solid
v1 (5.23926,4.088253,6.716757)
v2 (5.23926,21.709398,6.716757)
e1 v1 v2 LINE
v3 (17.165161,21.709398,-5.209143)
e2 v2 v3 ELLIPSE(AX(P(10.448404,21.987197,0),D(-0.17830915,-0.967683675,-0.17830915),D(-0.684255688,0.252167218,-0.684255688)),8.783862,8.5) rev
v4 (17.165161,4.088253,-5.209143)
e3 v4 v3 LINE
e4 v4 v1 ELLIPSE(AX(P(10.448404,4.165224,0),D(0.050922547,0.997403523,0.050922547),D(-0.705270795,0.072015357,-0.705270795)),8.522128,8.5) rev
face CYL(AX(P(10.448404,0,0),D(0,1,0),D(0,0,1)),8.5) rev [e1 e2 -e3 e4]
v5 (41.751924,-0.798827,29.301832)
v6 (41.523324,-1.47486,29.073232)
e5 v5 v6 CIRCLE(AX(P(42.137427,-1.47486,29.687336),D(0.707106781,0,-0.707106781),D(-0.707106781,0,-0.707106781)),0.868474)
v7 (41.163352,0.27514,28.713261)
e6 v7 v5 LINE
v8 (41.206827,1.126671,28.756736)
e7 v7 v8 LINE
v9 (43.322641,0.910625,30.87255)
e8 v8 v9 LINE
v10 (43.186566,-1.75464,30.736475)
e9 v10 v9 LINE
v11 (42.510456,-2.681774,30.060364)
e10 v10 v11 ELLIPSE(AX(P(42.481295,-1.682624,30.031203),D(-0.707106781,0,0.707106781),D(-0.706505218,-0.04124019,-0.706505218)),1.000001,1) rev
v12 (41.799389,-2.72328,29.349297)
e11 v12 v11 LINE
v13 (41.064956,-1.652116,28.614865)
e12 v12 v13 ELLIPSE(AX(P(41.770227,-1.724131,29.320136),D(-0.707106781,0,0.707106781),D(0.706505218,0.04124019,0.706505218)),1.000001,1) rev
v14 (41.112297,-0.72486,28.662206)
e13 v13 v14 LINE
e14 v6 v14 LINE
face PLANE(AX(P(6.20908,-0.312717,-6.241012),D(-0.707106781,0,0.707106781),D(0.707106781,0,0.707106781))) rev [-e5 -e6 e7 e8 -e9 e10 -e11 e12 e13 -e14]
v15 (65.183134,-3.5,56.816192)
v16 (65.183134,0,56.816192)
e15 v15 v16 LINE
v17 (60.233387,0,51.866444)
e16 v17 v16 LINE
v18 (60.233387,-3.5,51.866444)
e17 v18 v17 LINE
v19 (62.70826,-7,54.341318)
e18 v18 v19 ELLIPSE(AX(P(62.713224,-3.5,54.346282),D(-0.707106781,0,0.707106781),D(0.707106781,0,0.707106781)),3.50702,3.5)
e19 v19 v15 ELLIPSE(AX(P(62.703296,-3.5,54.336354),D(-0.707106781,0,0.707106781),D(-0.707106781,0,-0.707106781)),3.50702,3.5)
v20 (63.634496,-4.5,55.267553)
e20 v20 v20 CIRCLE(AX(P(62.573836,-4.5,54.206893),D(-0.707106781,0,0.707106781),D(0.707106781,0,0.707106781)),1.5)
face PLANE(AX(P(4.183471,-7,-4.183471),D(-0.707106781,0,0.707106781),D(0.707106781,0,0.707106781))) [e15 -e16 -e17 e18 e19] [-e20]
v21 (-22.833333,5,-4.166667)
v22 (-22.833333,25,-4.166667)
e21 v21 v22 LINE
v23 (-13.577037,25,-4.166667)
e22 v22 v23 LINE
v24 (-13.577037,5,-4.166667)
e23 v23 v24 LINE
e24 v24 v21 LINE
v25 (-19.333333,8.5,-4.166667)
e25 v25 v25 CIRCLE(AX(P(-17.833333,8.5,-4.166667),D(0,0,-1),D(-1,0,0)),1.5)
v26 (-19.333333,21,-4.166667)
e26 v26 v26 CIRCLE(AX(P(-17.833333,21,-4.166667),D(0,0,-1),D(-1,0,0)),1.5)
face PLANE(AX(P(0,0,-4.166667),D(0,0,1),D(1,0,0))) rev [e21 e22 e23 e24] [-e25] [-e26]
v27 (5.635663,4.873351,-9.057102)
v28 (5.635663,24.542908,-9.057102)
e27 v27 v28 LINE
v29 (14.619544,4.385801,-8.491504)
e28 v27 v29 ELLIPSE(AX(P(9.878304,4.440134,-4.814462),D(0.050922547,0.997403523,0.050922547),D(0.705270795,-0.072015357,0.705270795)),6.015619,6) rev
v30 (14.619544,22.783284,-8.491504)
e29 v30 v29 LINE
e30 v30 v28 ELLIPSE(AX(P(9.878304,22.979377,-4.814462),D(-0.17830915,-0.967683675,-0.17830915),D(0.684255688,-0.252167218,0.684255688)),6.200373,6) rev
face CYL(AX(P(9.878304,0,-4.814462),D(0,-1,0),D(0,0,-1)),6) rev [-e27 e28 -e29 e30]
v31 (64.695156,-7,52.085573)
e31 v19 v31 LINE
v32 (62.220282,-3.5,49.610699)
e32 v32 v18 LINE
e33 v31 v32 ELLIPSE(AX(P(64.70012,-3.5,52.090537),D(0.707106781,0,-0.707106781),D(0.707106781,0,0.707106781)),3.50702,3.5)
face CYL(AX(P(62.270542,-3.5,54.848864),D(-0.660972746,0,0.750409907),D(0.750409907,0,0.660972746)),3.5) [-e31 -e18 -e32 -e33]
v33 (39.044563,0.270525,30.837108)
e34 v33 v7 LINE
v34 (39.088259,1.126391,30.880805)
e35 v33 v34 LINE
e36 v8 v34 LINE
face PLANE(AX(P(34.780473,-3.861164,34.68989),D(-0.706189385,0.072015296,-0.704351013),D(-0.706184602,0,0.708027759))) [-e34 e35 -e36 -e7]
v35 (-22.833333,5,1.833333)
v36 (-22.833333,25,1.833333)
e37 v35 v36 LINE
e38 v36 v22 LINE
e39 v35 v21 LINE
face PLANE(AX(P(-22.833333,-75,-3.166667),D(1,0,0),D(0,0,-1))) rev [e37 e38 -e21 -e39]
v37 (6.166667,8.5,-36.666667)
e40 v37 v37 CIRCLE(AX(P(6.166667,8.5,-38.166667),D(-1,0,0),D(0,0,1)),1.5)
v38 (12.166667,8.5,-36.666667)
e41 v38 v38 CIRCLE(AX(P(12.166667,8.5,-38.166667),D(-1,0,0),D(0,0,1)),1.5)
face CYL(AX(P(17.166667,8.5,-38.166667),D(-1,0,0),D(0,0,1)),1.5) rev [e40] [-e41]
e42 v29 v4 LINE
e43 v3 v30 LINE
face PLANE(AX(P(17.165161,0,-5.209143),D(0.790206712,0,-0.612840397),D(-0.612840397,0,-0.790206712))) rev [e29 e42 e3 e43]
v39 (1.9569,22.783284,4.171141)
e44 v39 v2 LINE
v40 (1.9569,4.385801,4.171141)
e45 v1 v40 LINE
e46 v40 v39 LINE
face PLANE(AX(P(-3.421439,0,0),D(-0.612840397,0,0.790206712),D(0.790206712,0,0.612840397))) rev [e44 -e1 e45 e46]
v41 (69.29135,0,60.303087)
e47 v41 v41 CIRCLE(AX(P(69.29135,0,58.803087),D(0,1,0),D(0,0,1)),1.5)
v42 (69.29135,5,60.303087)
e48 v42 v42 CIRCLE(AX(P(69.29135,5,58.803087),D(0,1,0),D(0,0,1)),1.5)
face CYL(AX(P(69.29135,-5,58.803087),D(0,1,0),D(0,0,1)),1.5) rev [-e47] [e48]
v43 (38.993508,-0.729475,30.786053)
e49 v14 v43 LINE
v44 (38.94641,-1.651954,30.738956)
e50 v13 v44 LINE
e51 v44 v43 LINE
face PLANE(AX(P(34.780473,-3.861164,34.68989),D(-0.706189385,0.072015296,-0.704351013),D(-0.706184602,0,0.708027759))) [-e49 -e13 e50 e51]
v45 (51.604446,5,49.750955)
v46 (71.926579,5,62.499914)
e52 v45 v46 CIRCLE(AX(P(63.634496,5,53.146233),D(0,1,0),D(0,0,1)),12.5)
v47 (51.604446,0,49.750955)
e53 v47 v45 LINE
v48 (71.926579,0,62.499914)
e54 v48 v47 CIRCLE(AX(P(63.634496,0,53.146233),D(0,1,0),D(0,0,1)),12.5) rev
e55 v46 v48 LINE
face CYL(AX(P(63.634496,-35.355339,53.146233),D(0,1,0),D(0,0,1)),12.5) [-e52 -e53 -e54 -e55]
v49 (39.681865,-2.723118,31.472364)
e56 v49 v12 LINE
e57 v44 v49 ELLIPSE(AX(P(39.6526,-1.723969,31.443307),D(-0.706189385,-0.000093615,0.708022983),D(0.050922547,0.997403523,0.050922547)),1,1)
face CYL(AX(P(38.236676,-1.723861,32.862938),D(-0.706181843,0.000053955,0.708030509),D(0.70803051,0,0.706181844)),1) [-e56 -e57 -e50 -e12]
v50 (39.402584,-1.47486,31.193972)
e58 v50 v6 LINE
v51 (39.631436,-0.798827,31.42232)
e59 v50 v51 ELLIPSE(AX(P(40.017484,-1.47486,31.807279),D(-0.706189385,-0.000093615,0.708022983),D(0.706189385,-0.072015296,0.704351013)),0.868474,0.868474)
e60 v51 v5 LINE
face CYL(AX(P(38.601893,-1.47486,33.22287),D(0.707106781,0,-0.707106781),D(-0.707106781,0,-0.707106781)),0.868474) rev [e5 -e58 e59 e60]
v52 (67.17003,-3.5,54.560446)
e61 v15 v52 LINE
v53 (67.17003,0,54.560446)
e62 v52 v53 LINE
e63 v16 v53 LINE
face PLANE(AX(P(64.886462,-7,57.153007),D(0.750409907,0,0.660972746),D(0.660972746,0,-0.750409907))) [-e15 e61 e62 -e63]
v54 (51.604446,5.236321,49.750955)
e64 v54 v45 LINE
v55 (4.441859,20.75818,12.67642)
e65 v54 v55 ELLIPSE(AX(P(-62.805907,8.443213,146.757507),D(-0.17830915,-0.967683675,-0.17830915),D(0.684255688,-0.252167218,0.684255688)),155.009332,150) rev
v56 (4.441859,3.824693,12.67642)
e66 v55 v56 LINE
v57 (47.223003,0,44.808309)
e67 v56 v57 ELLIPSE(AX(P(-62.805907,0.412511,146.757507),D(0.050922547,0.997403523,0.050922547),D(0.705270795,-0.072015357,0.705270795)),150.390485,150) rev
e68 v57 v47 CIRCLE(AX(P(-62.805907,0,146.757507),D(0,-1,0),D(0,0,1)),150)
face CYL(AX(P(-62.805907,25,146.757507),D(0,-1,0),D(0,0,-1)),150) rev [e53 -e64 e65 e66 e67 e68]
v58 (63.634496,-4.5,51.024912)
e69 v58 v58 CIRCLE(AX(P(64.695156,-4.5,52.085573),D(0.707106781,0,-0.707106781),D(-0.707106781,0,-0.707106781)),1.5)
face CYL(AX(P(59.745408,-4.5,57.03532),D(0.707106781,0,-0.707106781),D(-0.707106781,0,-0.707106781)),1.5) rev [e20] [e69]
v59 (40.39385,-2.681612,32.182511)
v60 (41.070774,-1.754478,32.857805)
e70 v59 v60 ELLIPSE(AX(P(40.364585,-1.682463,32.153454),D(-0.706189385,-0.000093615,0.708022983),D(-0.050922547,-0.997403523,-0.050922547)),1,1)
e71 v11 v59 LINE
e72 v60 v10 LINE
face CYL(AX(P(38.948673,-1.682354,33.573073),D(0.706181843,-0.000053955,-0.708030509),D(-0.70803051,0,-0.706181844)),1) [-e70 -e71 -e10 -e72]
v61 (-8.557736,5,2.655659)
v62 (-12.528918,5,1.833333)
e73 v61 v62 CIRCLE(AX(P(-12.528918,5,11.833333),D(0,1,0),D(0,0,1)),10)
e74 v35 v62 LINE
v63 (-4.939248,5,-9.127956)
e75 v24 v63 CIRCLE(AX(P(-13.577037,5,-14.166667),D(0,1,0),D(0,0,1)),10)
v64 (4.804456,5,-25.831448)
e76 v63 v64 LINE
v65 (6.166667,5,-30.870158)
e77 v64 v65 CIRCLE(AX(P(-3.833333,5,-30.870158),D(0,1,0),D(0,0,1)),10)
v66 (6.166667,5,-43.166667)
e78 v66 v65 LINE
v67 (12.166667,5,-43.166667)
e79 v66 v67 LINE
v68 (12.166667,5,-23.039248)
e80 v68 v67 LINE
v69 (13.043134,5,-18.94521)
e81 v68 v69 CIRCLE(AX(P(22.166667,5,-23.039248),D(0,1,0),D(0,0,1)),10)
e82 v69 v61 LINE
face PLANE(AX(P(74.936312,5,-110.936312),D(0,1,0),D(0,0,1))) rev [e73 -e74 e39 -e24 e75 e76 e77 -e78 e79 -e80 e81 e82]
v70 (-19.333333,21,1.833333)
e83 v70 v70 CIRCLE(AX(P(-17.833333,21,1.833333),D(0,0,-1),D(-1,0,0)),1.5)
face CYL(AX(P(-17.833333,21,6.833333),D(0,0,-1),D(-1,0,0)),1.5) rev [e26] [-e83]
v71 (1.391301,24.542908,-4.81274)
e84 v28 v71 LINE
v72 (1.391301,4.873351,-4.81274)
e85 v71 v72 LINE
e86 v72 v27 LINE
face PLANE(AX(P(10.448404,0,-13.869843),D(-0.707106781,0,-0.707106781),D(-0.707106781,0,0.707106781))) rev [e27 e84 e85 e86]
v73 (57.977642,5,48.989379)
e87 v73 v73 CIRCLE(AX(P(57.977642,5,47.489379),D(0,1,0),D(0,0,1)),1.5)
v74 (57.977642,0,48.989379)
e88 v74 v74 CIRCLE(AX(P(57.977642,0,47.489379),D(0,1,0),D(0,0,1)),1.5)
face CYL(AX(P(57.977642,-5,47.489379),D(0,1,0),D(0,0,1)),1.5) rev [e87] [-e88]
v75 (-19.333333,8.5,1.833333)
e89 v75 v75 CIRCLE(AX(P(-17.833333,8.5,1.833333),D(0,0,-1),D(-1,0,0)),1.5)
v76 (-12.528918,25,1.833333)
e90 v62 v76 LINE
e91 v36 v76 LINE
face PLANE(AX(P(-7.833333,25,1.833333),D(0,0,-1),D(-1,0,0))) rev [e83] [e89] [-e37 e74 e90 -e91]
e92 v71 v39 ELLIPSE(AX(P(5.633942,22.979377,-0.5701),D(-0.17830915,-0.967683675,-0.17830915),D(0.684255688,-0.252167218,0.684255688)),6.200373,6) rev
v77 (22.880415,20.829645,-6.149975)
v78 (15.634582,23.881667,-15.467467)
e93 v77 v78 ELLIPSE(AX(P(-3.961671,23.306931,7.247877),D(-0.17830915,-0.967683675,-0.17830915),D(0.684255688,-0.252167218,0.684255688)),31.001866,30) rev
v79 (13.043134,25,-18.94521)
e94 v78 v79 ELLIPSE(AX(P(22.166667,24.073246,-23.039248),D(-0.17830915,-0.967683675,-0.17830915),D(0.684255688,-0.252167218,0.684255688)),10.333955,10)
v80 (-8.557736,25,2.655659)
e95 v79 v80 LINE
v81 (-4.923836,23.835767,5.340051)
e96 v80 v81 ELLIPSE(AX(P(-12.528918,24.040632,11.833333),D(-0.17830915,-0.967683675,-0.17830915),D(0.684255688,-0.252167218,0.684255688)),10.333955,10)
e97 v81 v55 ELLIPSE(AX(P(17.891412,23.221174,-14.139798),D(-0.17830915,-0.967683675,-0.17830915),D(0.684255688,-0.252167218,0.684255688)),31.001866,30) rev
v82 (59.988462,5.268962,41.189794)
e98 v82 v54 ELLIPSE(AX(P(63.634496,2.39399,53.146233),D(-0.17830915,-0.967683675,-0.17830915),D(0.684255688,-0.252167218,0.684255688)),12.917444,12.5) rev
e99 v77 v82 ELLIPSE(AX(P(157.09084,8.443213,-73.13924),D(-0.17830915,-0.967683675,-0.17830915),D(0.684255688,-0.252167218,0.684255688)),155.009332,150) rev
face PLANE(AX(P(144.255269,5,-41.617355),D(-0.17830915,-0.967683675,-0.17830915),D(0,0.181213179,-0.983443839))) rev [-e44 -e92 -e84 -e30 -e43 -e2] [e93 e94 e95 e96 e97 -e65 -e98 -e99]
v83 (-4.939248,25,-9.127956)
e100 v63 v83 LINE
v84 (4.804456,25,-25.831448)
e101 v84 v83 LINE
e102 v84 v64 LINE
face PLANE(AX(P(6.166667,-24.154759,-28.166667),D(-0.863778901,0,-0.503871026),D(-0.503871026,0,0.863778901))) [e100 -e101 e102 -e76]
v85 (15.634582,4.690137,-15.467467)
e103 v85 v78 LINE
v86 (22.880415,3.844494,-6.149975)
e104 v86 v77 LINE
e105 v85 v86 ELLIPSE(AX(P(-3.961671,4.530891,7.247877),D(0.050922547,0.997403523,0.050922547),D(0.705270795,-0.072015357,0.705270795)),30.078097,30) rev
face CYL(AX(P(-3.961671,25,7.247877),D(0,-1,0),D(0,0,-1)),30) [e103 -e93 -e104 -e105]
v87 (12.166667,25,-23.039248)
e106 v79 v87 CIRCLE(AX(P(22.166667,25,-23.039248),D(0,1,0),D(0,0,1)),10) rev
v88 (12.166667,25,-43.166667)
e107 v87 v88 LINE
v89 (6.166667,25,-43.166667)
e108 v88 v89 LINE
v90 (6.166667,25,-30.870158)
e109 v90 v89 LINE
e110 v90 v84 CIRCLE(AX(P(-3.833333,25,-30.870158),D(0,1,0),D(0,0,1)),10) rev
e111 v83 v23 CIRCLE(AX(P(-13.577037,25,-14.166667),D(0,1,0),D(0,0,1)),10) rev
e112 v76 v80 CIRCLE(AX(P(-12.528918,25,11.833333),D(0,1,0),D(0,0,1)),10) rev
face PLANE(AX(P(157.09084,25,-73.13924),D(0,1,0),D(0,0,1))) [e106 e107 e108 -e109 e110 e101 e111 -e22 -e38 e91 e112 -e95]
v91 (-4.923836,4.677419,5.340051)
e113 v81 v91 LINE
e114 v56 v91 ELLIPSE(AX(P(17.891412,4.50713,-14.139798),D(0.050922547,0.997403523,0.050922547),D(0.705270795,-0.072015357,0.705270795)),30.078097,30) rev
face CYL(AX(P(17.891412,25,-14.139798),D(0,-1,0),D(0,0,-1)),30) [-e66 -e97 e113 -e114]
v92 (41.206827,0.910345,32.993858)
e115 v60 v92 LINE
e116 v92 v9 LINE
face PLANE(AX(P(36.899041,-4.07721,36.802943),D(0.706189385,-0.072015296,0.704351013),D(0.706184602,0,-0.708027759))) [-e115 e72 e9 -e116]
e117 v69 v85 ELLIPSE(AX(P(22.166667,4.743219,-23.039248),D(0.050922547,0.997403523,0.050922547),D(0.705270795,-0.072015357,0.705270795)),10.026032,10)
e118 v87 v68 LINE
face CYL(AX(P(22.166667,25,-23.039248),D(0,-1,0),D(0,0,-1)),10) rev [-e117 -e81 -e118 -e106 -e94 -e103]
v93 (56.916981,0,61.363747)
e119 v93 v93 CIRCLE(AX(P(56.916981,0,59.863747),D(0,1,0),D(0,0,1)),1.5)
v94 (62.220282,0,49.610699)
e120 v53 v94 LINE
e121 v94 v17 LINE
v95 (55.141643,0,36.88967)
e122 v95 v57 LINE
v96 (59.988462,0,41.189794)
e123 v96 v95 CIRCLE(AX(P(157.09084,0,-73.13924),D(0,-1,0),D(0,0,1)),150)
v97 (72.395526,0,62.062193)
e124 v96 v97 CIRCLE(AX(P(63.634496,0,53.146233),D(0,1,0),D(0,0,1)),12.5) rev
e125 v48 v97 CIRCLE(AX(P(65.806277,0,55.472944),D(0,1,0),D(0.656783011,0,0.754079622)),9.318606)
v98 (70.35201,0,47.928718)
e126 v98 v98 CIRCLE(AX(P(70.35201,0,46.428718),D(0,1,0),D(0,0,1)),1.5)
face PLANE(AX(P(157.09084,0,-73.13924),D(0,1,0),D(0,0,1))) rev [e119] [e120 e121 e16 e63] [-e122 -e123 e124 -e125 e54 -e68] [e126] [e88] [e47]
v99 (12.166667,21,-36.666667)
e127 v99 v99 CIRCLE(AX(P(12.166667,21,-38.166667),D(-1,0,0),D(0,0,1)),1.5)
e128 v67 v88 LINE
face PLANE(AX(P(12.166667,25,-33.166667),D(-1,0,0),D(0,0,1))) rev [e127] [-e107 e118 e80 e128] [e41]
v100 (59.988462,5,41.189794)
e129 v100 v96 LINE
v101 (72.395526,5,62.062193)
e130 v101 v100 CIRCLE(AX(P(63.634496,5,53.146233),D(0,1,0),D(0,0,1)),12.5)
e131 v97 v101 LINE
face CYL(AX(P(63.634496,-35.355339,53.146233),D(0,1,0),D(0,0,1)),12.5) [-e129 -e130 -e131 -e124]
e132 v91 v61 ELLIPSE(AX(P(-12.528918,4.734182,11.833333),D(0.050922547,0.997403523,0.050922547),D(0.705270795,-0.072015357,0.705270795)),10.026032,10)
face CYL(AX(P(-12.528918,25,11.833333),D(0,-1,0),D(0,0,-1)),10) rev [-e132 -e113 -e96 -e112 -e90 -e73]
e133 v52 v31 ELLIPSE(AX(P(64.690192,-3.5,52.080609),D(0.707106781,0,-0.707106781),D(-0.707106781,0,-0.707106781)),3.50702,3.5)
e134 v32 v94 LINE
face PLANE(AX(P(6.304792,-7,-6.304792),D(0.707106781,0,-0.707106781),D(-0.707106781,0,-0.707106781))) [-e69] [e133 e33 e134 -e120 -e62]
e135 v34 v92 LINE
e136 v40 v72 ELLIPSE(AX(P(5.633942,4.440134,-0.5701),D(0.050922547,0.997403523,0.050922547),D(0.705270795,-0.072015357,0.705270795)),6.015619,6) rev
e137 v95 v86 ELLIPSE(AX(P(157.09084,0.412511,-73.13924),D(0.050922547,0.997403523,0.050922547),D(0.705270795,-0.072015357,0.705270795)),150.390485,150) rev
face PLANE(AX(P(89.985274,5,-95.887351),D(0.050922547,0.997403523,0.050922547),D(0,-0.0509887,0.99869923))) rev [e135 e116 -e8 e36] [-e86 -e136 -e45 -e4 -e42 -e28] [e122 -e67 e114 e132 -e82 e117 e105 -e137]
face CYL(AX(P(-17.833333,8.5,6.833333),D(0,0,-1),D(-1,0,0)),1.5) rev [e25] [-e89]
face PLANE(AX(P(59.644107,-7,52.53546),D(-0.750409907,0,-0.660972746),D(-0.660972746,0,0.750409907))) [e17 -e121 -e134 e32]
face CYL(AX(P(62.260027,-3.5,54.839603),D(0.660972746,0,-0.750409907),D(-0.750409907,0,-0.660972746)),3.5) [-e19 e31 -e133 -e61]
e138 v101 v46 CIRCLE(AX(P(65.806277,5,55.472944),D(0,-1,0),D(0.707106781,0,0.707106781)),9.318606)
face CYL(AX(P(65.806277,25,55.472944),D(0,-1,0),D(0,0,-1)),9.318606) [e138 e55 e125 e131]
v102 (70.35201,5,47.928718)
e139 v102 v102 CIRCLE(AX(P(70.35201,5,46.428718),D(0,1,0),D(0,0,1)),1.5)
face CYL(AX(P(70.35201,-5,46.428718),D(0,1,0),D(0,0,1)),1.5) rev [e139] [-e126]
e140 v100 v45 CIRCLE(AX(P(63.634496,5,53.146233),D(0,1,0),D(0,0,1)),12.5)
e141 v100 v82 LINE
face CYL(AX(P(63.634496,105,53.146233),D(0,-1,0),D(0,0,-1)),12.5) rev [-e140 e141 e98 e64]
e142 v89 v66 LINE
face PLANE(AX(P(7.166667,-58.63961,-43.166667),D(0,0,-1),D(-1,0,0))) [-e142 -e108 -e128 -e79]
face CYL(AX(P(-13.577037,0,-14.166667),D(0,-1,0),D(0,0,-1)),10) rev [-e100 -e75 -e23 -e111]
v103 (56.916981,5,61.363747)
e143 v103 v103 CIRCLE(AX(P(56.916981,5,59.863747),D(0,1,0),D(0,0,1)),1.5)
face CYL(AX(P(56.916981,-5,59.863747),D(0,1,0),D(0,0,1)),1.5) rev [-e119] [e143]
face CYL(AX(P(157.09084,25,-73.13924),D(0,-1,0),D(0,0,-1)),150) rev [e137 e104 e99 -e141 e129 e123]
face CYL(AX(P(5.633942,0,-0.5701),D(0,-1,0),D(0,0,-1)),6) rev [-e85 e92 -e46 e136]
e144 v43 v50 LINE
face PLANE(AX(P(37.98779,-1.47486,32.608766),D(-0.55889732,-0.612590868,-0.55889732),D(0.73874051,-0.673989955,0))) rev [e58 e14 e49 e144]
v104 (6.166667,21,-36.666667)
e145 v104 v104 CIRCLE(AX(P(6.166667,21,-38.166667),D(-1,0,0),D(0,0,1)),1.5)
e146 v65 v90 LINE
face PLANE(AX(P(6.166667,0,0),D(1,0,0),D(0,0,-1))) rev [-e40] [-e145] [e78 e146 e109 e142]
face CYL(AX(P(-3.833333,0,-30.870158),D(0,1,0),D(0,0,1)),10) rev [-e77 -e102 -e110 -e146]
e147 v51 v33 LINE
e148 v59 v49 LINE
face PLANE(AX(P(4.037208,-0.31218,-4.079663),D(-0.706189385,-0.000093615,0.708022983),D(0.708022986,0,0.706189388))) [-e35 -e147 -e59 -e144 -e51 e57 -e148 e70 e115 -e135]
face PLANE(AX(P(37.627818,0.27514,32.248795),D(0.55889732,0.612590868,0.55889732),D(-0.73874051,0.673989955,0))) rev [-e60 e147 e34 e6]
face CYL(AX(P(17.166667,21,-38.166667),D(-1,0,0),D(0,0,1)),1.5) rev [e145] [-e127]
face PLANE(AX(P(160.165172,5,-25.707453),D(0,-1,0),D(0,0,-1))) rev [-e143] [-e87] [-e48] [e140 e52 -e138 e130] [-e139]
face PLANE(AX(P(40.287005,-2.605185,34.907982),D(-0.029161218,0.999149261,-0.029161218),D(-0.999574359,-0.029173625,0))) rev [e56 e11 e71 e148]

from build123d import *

# Parameters (mm, degrees)
BOSS_EXTRUDE3_DEPTH     = 25
FILLET2_R               = 30
SKETCH2_R               = 1.5
CUT_EXTRUDE1_DEPTH      = 25
SKETCH3_R               = 1.5
CUT_EXTRUDE2_DEPTH      = 25
CUT_EXTRUDE4_DEPTH      = 25
FILLET3_R               = 6
BOSS_EXTRUDE4_DEPTH     = 25
CUT_EXTRUDE6_DEPTH      = 100
CUT_EXTRUDE6_DEPTH_BACK = 100
SKETCH10_W              = 160.183879056
SKETCH10_H              = 83.114276869
SKETCH11_R              = 12.5
BOSS_EXTRUDE5_DEPTH     = 5
CUT_EXTRUDE7_START      = 100
SKETCH12_R              = 12.5
CUT_EXTRUDE7_DEPTH      = 100
FILLET5_R               = 10
BOSS_EXTRUDE9_DEPTH     = 20
CUT_EXTRUDE9_DEPTH      = 100
SKETCH15_W              = 10
SKETCH15_H              = 5
CUT_EXTRUDE10_DEPTH     = 100
SKETCH16_R              = 1.5
CUT_EXTRUDE11_DEPTH     = 10
SKETCH17_R              = 1.5
CUT_EXTRUDE12_DEPTH     = 10
FILLET7_R               = 10
SKETCH18_R              = 1.5
CUT_EXTRUDE14_DEPTH     = 10
BOSS_EXTRUDE10_DEPTH    = 7
SKETCH21_R              = 1.5
CUT_EXTRUDE15_DEPTH     = 7
FILLET8_R               = 3.5
BOSS_EXTRUDE13_DEPTH    = 5
CUT_EXTRUDE16_DEPTH     = 5
CUT_EXTRUDE18_DEPTH     = 5
FILLET10_R              = 1
BOSS_EXTRUDE14_START    = 1
SKETCH27_W              = 15
SKETCH27_H              = 20
SKETCH27_R              = 1.5
BOSS_EXTRUDE14_DEPTH    = 1
BOSS_EXTRUDE15_START    = 1
SKETCH28_W              = 15
SKETCH28_H              = 20
SKETCH28_R              = 1.5
BOSS_EXTRUDE15_DEPTH    = 1
BOSS_EXTRUDE16_DEPTH    = 20
FILLET11_R              = 10


with BuildPart() as part:
    # Sketch1 → Boss-Extrude3 (new body)
    with BuildSketch(Plane(origin=(0, 0, 0), x_dir=(1, 0, 0), z_dir=(0, 1, 0))):
        with BuildLine():
            Line((-32.833333333, 3.166666667), (-17.833333333, 3.166666667))
            Line((-17.833333333, 3.166666667), (7.166666667, 18.166666667))
            Line((7.166666667, 18.166666667), (7.166666667, 33.166666667))
            Line((7.166666667, 33.166666667), (12.166666667, 33.166666667))
            Line((12.166666667, 33.166666667), (12.166666667, 18.166666667))
            Line((12.166666667, 18.166666667), (17.527177031, 18.166666667))
            ThreePointArc((17.527177031, 18.166666667), (37.442198793, -17.327342211), (66.165661867, -46.161270611))
            ThreePointArc((66.165661867, -46.161270611), (72.395526252, -62.062192918), (56.494603945, -55.832328533))
            ThreePointArc((56.494603945, -55.832328533), (27.660675544, -27.10886546), (-7.833333333, -7.193843698))
            Line((-7.833333333, -7.193843698), (-7.833333333, -1.833333333))
            Line((-7.833333333, -1.833333333), (-32.833333333, -1.833333333))
            Line((-32.833333333, -1.833333333), (-32.833333333, 3.166666667))
        make_face()
    extrude(amount=BOSS_EXTRUDE3_DEPTH)

    # Chamfer2
    # the kernel refuses this chamfer: 6, 5.627229018 mm, written as the material it takes off along each edge
    with BuildSketch(Plane(origin=(17.527177031, -14.820831596, -18.166666667), x_dir=(-0.9997164223008481, 0, -0.023813336221376217), z_dir=(0, 1, 0))) as chamfer2_piece_1_section:
        with BuildLine():
            Line((5.702702936, 0), (-2.525905891, 5.363294445))
            Line((-2.525905891, 5.363294445), (-2.634618021, 5.31248428))
            ThreePointArc((-2.634618021, 5.31248428), (-1.288030314, 2.670484416), (-0.110572005, -0.046624369))
            Line((-0.110572005, -0.046624369), (0.0028576, -0.119965971))
            ThreePointArc((0.0028576, -0.119965971), (2.852592138, -0.052085034), (5.705560536, -0.119965971))
            Line((5.705560536, -0.119965971), (5.702702936, 0))
        make_face()
    chamfer2_piece_1 = extrude(amount=54.641663192, mode=Mode.PRIVATE)
    chamfer2_piece_1 = split(chamfer2_piece_1, bisect_by=Plane(origin=(12.166666667, 12.5, -16.425975933), z_dir=(1, 0, 0)), keep=Keep.TOP, mode=Mode.PRIVATE)
    add(chamfer2_piece_1, mode=Mode.SUBTRACT)
    with BuildSketch(Plane(origin=(-7.833333333, -15.240510768, 7.193843698), x_dir=(-0.020819858729133396, 0, -0.999783243249505), z_dir=(0, 1, 0))) as chamfer2_piece_2_section:
        with BuildLine():
            Line((6.096204307, 0), (-2.361428154, -5.028621182))
            Line((-2.361428154, -5.028621182), (-2.470415157, -4.978403325))
            ThreePointArc((-2.470415157, -4.978403325), (-1.204815622, -2.503704319), (-0.110711113, 0.046293083))
            Line((-0.110711113, 0.046293083), (0.002498383, 0.119973989))
            ThreePointArc((0.002498383, 0.119973989), (3.049279286, 0.056526689), (6.09870269, 0.119973989))
            Line((6.09870269, 0.119973989), (6.096204307, 0))
        make_face()
    chamfer2_piece_2 = extrude(amount=55.481021536, mode=Mode.PRIVATE)
    chamfer2_piece_2 = split(chamfer2_piece_2, bisect_by=Plane(origin=(-6.193350631, 12.5, 1.833333333), z_dir=(0, 0, 1)), keep=Keep.TOP, mode=Mode.PRIVATE)
    add(chamfer2_piece_2, mode=Mode.SUBTRACT)

    # Fillet2
    # the kernel refuses this fillet: 30 mm, written as the material it takes off along each edge
    with BuildSketch(Plane(origin=(19.726764246, 45.355475944, -12.880543269), x_dir=(0.42429011681478046, 0, 0.9055263092662189), z_dir=(0, -1, 0))) as fillet2_piece_1:
        with BuildLine():
            CenterArc((8.176045785, 29.990790911), FILLET2_R, 239.5660286, 29.014271836)
            Line((-7.020306331, 4.124386399), (0, 0))
            ThreePointArc((0, 0), (3.716384448, 0.046045445), (7.432768895, 0))
        make_face()
    extrude(amount=65.710951888, mode=Mode.SUBTRACT)
    with BuildSketch(Plane(origin=(-2.883559651, 47.152983024, 9.246371963), x_dir=(0.9056360428972143, 0, 0.4240558427913414), z_dir=(0, -1, 0))) as fillet2_piece_2_section:
        with BuildLine():
            CenterArc((8.898038247, -29.989092358), FILLET2_R, 91.545096469, 31.436731661)
            Line((-7.433152225, -4.823794471), (0, 0))
            ThreePointArc((0, 0), (4.044562839, -0.05453821), (8.089125679, 0))
        make_face()
    fillet2_piece_2 = extrude(amount=69.305966049, mode=Mode.PRIVATE)
    fillet2_piece_2 = split(fillet2_piece_2, bisect_by=Plane(origin=(-2.472074329, 12.5, 1.833333333), z_dir=(0, 0, 1)), keep=Keep.TOP, mode=Mode.PRIVATE)
    add(fillet2_piece_2, mode=Mode.SUBTRACT)

    # Sketch2 → Cut-Extrude1 (cut)
    with BuildSketch(Plane.XY.offset(1.833333333)):
        with Locations((-27.833333333, 20)):
            Circle(SKETCH2_R)
        with Locations((-27.833333333, 7.5)):
            Circle(SKETCH2_R)
    extrude(amount=-CUT_EXTRUDE1_DEPTH, mode=Mode.SUBTRACT)

    # Sketch3 → Cut-Extrude2 (cut)
    with BuildSketch(Plane(origin=(12.166666667, 0, 0), x_dir=(0, 0, -1), z_dir=(1, 0, 0))):
        with Locations((28.166666667, 20)):
            Circle(SKETCH3_R)
        with Locations((28.166666667, 7.5)):
            Circle(SKETCH3_R)
    extrude(amount=-CUT_EXTRUDE2_DEPTH, mode=Mode.SUBTRACT)

    # Sketch4 → Cut-Extrude4 (cut)
    with BuildSketch(Plane(origin=(0, 25, 0), x_dir=(1, 0, 0), z_dir=(0, 1, 0))):
        with BuildLine():
            Line((17.165160832, 5.209143376), (10.448403781, 13.869842848))
            Line((10.448403781, 13.869842848), (-3.421439067, 0))
            Line((-3.421439067, 0), (5.239260404, -6.716757051))
            ThreePointArc((5.239260404, -6.716757051), (16.458811421, -6.01040764), (17.165160832, 5.209143376))
        make_face()
    extrude(amount=-CUT_EXTRUDE4_DEPTH, mode=Mode.SUBTRACT)

    # Fillet3
    fillet3_edges = [part.edges().sort_by_distance(p)[0] for p in [
        (-3.421439067, 12.5, 0),
        (10.448403781, 12.5, -13.869842848),
    ]]
    fillet(fillet3_edges, radius=FILLET3_R)

    # Sketch7 → Boss-Extrude4 (add)
    with BuildSketch(Plane(origin=(0, 25, 0), x_dir=(1, 0, 0), z_dir=(0, 1, 0))):
        Polygon((8.953526914, 27.464178608), (42.758807377, -6.341101855), (46.775588972, -2.324320261), (12.970308509, 31.480960203), align=None)
    extrude(amount=BOSS_EXTRUDE4_DEPTH)

    # Sketch10 → Cut-Extrude6 (cut, two sides: drawn at the far end of the back side and taken through both)
    with BuildSketch(Plane(origin=(22.225634356, 0, -22.225634356), x_dir=(-0.7071067811865475, 0, -0.7071067811865477), z_dir=(0.7071067811865477, 0, -0.7071067811865475)).offset(-CUT_EXTRUDE6_DEPTH_BACK)):
        with Locations((-36.711585848, 10.87638512)):
            Rectangle(SKETCH10_W, SKETCH10_H)
        Polygon((-95.075965008, 0), (-95.075965008, 5), (-72.575965008, 5), (4.173398499, 25), (18.384776311, 25), (25.455844123, 25), (25.455844123, 5), (18.384776311, 5), (4.173398499, 5), (-65.075965008, 0), align=None, mode=Mode.SUBTRACT)
    extrude(amount=CUT_EXTRUDE6_DEPTH + CUT_EXTRUDE6_DEPTH_BACK, mode=Mode.SUBTRACT)

    # Sketch11 → Boss-Extrude5 (add)
    with BuildSketch(Plane(origin=(0, 5, 0), x_dir=(1, 0, 0), z_dir=(0, 1, 0))):
        with Locations((63.634495769, -53.146232797)):
            Circle(SKETCH11_R)
    extrude(amount=-BOSS_EXTRUDE5_DEPTH)

    # Sketch12 → Cut-Extrude7 (cut)
    with BuildSketch(Plane(origin=(0, 5, 0), x_dir=(1, 0, 0), z_dir=(0, 1, 0)).offset(CUT_EXTRUDE7_START)):
        with Locations((63.634495769, -53.146232797)):
            Circle(SKETCH12_R)
    extrude(amount=-CUT_EXTRUDE7_DEPTH, mode=Mode.SUBTRACT)

    # Fillet5
    fillet5_edges = [part.edges().sort_by_distance(p)[0] for p in [
        (-17.833333333, 15, -3.166666667),
        (7.166666667, 15, -18.166666667),
    ]]
    fillet(fillet5_edges, radius=FILLET5_R)

    # Sketch13 → Boss-Extrude9 (add)
    with BuildSketch(Plane(origin=(0, 25, 0), x_dir=(1, 0, 0), z_dir=(0, 1, 0))):
        Polygon((-32.833333333, 3.166666667), (-7.833333333, 3.166666667), (7.166666667, 28.166666667), (7.166666667, 43.166666667), (12.166666667, 43.166666667), (12.166666667, 18.068743425), (-7.735410091, -1.833333333), (-32.833333333, -1.833333333), align=None)
    extrude(amount=-BOSS_EXTRUDE9_DEPTH)

    # Sketch14 → Cut-Extrude9 (cut)
    with BuildSketch(Plane(origin=(0, 25, 0), x_dir=(1, 0, 0), z_dir=(0, 1, 0))):
        Polygon((-23.490794192, 3.166666667), (-7.833333333, 3.166666667), (-1.163922491, 14.282351403), align=None)
    extrude(amount=-CUT_EXTRUDE9_DEPTH, mode=Mode.SUBTRACT)

    # Sketch15 → Cut-Extrude10 (cut)
    with BuildSketch(Plane(origin=(0, 25, 0), x_dir=(1, 0, 0), z_dir=(0, 1, 0))):
        with Locations((-27.833333333, 0.666666667)):
            Rectangle(SKETCH15_W, SKETCH15_H)
    extrude(amount=-CUT_EXTRUDE10_DEPTH, mode=Mode.SUBTRACT)

    # Sketch16 → Cut-Extrude11 (cut)
    with BuildSketch(Plane.ZY.offset(-7.166666667)):
        with Locations((-38.166666667, 21)):
            Circle(SKETCH16_R)
        with Locations((-38.166666667, 8.5)):
            Circle(SKETCH16_R)
    extrude(amount=-CUT_EXTRUDE11_DEPTH, mode=Mode.SUBTRACT)

    # Sketch17 → Cut-Extrude12 (cut)
    with BuildSketch(Plane(origin=(0, 0, -3.166666667), x_dir=(-1, 0, 0), z_dir=(0, 0, -1))):
        with Locations((17.833333333, 21)):
            Circle(SKETCH17_R)
        with Locations((17.833333333, 8.5)):
            Circle(SKETCH17_R)
    extrude(amount=-CUT_EXTRUDE12_DEPTH, mode=Mode.SUBTRACT)

    # Fillet7
    # the kernel refuses this fillet: 10 mm, written as the material it adds along each edge
    with BuildSketch(Plane(origin=(-7.502347281, -7.577664342, 1.833333333), x_dir=(-1, 0, 0), z_dir=(0, 1, 0))) as fillet7_piece_1_section:
        with BuildLine():
            CenterArc((5.026306118, 10), FILLET7_R, 220.490539219, 49.509460781)
            ThreePointArc((-2.578825815, 3.506775201), (-1.225726194, 1.80022178), (0, 0))
            Line((0, 0), (5.026306118, 0))
        make_face()
    fillet7_piece_1 = extrude(amount=45.100484579, mode=Mode.PRIVATE)
    fillet7_piece_1 = split(fillet7_piece_1, bisect_by=Plane(origin=(-6.299503341, 5, 3.722138351), z_dir=(0, -1, 0)), keep=Keep.TOP, mode=Mode.PRIVATE)
    fillet7_piece_1 = split(fillet7_piece_1, bisect_by=Plane(origin=(-6.303814006, 4.830696636, 3.717827687), z_dir=(0.05092254709852862, 0.9974035233515051, 0.05092254709852862)), keep=Keep.TOP, mode=Mode.PRIVATE)
    add(fillet7_piece_1)
    with BuildSketch(Plane(origin=(-7.502347281, -7.577664342, 1.833333333), x_dir=(-1, 0, 0), z_dir=(0, 1, 0))) as fillet7_piece_2_section:
        with BuildLine():
            CenterArc((5.026306118, 10), FILLET7_R, 220.490539219, 49.509460781)
            ThreePointArc((-2.578825815, 3.506775201), (-1.225726194, 1.80022178), (0, 0))
            Line((0, 0), (5.026306118, 0))
        make_face()
    fillet7_piece_2 = extrude(amount=45.100484579, mode=Mode.PRIVATE)
    fillet7_piece_2 = split(fillet7_piece_2, bisect_by=Plane(origin=(-10.467928875, 5, 1.847831753), z_dir=(0, 1, 0)), keep=Keep.TOP, mode=Mode.PRIVATE)
    fillet7_piece_2 = split(fillet7_piece_2, bisect_by=Plane(origin=(-10.464404817, 5.138408988, 1.85135581), z_dir=(-0.05092254709852862, -0.9974035233515051, -0.05092254709852862)), keep=Keep.TOP, mode=Mode.PRIVATE)
    add(fillet7_piece_2)
    with BuildSketch(Plane(origin=(-7.502347281, -7.577664342, 1.833333333), x_dir=(-1, 0, 0), z_dir=(0, 1, 0))) as fillet7_piece_3_section:
        with BuildLine():
            CenterArc((5.026306118, 10), FILLET7_R, 220.490539219, 49.509460781)
            ThreePointArc((-2.578825815, 3.506775201), (-1.225726194, 1.80022178), (0, 0))
            Line((0, 0), (5.026306118, 0))
        make_face()
    fillet7_piece_3 = extrude(amount=45.100484579, mode=Mode.PRIVATE)
    fillet7_piece_3 = split(fillet7_piece_3, bisect_by=Plane(origin=(-8.143046579, 25, 2.567869608), z_dir=(0, -1, 0)), keep=Keep.TOP, mode=Mode.PRIVATE)
    fillet7_piece_3 = split(fillet7_piece_3, bisect_by=Plane(origin=(-8.143046579, 5, 2.567869608), z_dir=(0, 1, 0)), keep=Keep.TOP, mode=Mode.PRIVATE)
    fillet7_piece_3 = split(fillet7_piece_3, bisect_by=Plane(origin=(-6.413698514, 24.302451402, 4.297217673), z_dir=(-0.17830914996233782, -0.9676836745958967, -0.17830914996233793)), keep=Keep.TOP, mode=Mode.PRIVATE)
    fillet7_piece_3 = split(fillet7_piece_3, bisect_by=Plane(origin=(-8.64759618, 5.034829767, 2.063320006), z_dir=(0.05092254709852862, 0.9974035233515051, 0.05092254709852862)), keep=Keep.TOP, mode=Mode.PRIVATE)
    add(fillet7_piece_3)
    with BuildSketch(Plane(origin=(12.166666667, 25, -18.068743425), x_dir=(0, 0, -1), z_dir=(0, -1, 0))) as fillet7_piece_4_section:
        with BuildLine():
            CenterArc((4.970504995, 10), FILLET7_R, 220.783942831, 49.216057169)
            Line((-2.601276479, 3.467915699), (-3.358454626, 2.814707269))
            ThreePointArc((-3.358454626, 2.814707269), (-1.405583009, 0.280875666), (-0.824518548, -0.565834927))
            Line((-0.824518548, -0.565834927), (0, -1))
            Line((0, -1), (4.970504995, -1))
            Line((4.970504995, -1), (4.970504995, 0))
        make_face()
    fillet7_piece_4 = extrude(amount=20, mode=Mode.PRIVATE)
    fillet7_piece_4 = split(fillet7_piece_4, bisect_by=Plane(origin=(14.359334309, 24.376039861, -16.875179681), z_dir=(-0.17830914996233782, -0.9676836745958967, -0.17830914996233793)), keep=Keep.TOP, mode=Mode.PRIVATE)
    fillet7_piece_4 = split(fillet7_piece_4, bisect_by=Plane(origin=(12.113566037, 5.056431477, -19.120947952), z_dir=(0.05092254709852862, 0.9974035233515051, 0.05092254709852862)), keep=Keep.TOP, mode=Mode.PRIVATE)
    add(fillet7_piece_4)
    with BuildSketch(Plane(origin=(12.166666667, 25, -18.068743425), x_dir=(0, 0, -1), z_dir=(0, -1, 0))) as fillet7_piece_5_section:
        with BuildLine():
            CenterArc((4.970504995, 10), FILLET7_R, 220.783942831, 49.216057169)
            Line((-2.601276479, 3.467915699), (-3.358454626, 2.814707269))
            ThreePointArc((-3.358454626, 2.814707269), (-1.405583009, 0.280875666), (-0.824518548, -0.565834927))
            Line((-0.824518548, -0.565834927), (0, -1))
            Line((0, -1), (4.970504995, -1))
            Line((4.970504995, -1), (4.970504995, 0))
        make_face()
    fillet7_piece_5 = extrude(amount=32.426262487, mode=Mode.PRIVATE)
    fillet7_piece_5 = split(fillet7_piece_5, bisect_by=Plane(origin=(14.100710146, 5, -16.202051862), z_dir=(0, -1, 0)), keep=Keep.TOP, mode=Mode.PRIVATE)
    fillet7_piece_5 = split(fillet7_piece_5, bisect_by=Plane(origin=(14.095782292, 4.806456237, -16.206979716), z_dir=(0.05092254709852862, 0.9974035233515051, 0.05092254709852862)), keep=Keep.TOP, mode=Mode.PRIVATE)
    add(fillet7_piece_5)
    with BuildSketch(Plane(origin=(12.166666667, 25, -18.068743425), x_dir=(0, 0, -1), z_dir=(0, -1, 0))) as fillet7_piece_6_section:
        with BuildLine():
            CenterArc((4.970504995, 10), FILLET7_R, 220.783942831, 49.216057169)
            Line((-2.601276479, 3.467915699), (-3.358454626, 2.814707269))
            ThreePointArc((-3.358454626, 2.814707269), (-1.405583009, 0.280875666), (-0.824518548, -0.565834927))
            Line((-0.824518548, -0.565834927), (0, -1))
            Line((0, -1), (4.970504995, -1))
            Line((4.970504995, -1), (4.970504995, 0))
        make_face()
    fillet7_piece_6 = extrude(amount=20, mode=Mode.PRIVATE)
    fillet7_piece_6 = split(fillet7_piece_6, bisect_by=Plane(origin=(11.727300313, 5.177477113, -21.105564101), z_dir=(-0.05092254709852862, -0.9974035233515051, -0.05092254709852862)), keep=Keep.TOP, mode=Mode.PRIVATE)
    add(fillet7_piece_6)

    # Sketch18 → Cut-Extrude14 (cut)
    with BuildSketch(Plane(origin=(0, 5, 0), x_dir=(1, 0, 0), z_dir=(0, 1, 0))):
        with Locations(Location((56.916981348, -59.863747218, 0), (0, 0, 270))):
            Circle(SKETCH18_R)
        with Locations(Location((70.35201019, -46.428718376, 0), (0, 0, 270))):
            Circle(SKETCH18_R)
        with Locations(Location((57.97764152, -47.489378547, 0), (0, 0, 270))):
            Circle(SKETCH18_R)
        with Locations(Location((69.291350019, -58.803087046, 0), (0, 0, 270))):
            Circle(SKETCH18_R)
    extrude(amount=-CUT_EXTRUDE14_DEPTH, mode=Mode.SUBTRACT)

    # Sketch20 → Boss-Extrude10 (add)
    with BuildSketch(Plane.XZ):
        Polygon((65.183134159, 56.81619153), (67.170029675, 54.560446359), (62.220282207, 49.610698891), (60.233386691, 51.866444062), align=None)
    extrude(amount=BOSS_EXTRUDE10_DEPTH)

    # Sketch21 → Cut-Extrude15 (cut)
    with BuildSketch(Plane(origin=(6.304791658, 0, -6.304791658), x_dir=(-0.7071067811865461, 0, -0.707106781186549), z_dir=(0.707106781186549, 0, -0.7071067811865461))):
        with Locations((-82.576445081, -4.5)):
            Circle(SKETCH21_R)
    extrude(amount=-CUT_EXTRUDE15_DEPTH, mode=Mode.SUBTRACT)

    # Fillet8
    # the kernel refuses this fillet: 3.5 mm, written as the material it takes off along each edge
    with BuildSketch(Plane(origin=(59.399622631, -7, 63.382278219), x_dir=(0, 1, 0), z_dir=(0.6609727460873192, 0, -0.7504099072705454)), Plane(origin=(68.003793735, -7, 43.044612202), x_dir=(0, 1, 0), z_dir=(-0.6609727460873219, 0, 0.7504099072705428))) as fillet8_piece_1:
        with BuildLine():
            CenterArc((FILLET8_R, -FILLET8_R), FILLET8_R, 90, 90)
            Line((0, -FILLET8_R), (0, 0))
            Line((0, 0), (FILLET8_R, 0))
        make_face()
    extrude(amount=20.50601731, mode=Mode.SUBTRACT)

    # Sketch24 → Boss-Extrude13 (add)
    with BuildSketch(Plane(origin=(0.23864693, 4.674300528, 0.23864693), x_dir=(-0.9987026054822318, 0.05085630859006412, 0.002596474454724954), z_dir=(-0.05092254709852865, -0.9974035233515052, -0.050922547098528656))):
        Polygon((-43.139964089, -30.785960317), (-41.021401305, -32.904523102), (-38.900080962, -30.783202758), (-41.021401305, -28.661882414), align=None)
    extrude(amount=BOSS_EXTRUDE13_DEPTH)

    # Sketch25 → Cut-Extrude16 (cut)
    with BuildSketch(Plane(origin=(6.22504574, 0, -6.22504574), x_dir=(-0.7071067811865479, 0, -0.7071067811865471), z_dir=(0.7071067811865471, 0, -0.7071067811865479))):
        with BuildLine():
            Line((-49.919303237, -1.47486047), (-49.338024072, -0.72486047))
            Line((-49.338024072, -0.72486047), (-49.410226901, 0.27513953))
            Line((-49.410226901, 0.27513953), (-50.242592935, -0.798827271))
            ThreePointArc((-50.242592935, -0.798827271), (-51.571270298, -1.849539371), (-49.919303237, -1.47486047))
        make_face()
    extrude(amount=-CUT_EXTRUDE16_DEPTH, mode=Mode.SUBTRACT)

    # Sketch26 → Cut-Extrude18 (cut)
    with BuildSketch(Plane(origin=(6.22504574, 0, -6.22504574), x_dir=(-0.7071067811865479, 0, -0.7071067811865471), z_dir=(0.7071067811865471, 0, -0.7071067811865479))):
        Polygon((-53.17088521, -2.605184508), (-47.853660079, -2.824654594), (-48.053771996, -4.778906076), (-52.998057051, -4.922262957), align=None)
    extrude(amount=-CUT_EXTRUDE18_DEPTH, mode=Mode.SUBTRACT)

    # Fillet10
    fillet10_edges = [part.edges().sort_by_distance(p)[0] for p in [
        (39.94863606, -2.769399449, 29.619863131),
        (42.083214828, -2.644880095, 31.751684343),
    ]]
    fillet(fillet10_edges, radius=FILLET10_R)

    # Sketch27 → Boss-Extrude14 (add)
    with BuildSketch(Plane.ZY.offset(-7.166666667).offset(BOSS_EXTRUDE14_START)):
        with Locations((-35.666666667, 15)):
            Rectangle(SKETCH27_W, SKETCH27_H)
        with Locations((-38.166666667, 21)):
            Circle(SKETCH27_R, mode=Mode.SUBTRACT)
        with Locations((-38.166666667, 8.5)):
            Circle(SKETCH27_R, mode=Mode.SUBTRACT)
    extrude(amount=-BOSS_EXTRUDE14_DEPTH)

    # Sketch28 → Boss-Extrude15 (add)
    with BuildSketch(Plane(origin=(0, 0, -3.166666667), x_dir=(-1, 0, 0), z_dir=(0, 0, -1)).offset(BOSS_EXTRUDE15_START)):
        with Locations((15.333333333, 15)):
            Rectangle(SKETCH28_W, SKETCH28_H)
        with Locations((17.833333333, 21)):
            Circle(SKETCH28_R, mode=Mode.SUBTRACT)
        with Locations((17.833333333, 8.5)):
            Circle(SKETCH28_R, mode=Mode.SUBTRACT)
    extrude(amount=-BOSS_EXTRUDE15_DEPTH)

    # Sketch29 → Boss-Extrude16 (add)
    with BuildSketch(Plane(origin=(0, 25, 0), x_dir=(1, 0, 0), z_dir=(0, 1, 0))):
        Polygon((7.166666667, 28.166666667), (-7.833333333, 3.166666667), (-7.833333333, 4.166666667), (6.166666667, 28.166666667), align=None)
    extrude(amount=-BOSS_EXTRUDE16_DEPTH)

    # Fillet11
    fillet11_edges = [part.edges().sort_by_distance(p)[0] for p in [
        (6.166666667, 15, -28.166666667),
        (-7.833333333, 15, -4.166666667),
    ]]
    fillet(fillet11_edges, radius=FILLET11_R)


solid = part.part
